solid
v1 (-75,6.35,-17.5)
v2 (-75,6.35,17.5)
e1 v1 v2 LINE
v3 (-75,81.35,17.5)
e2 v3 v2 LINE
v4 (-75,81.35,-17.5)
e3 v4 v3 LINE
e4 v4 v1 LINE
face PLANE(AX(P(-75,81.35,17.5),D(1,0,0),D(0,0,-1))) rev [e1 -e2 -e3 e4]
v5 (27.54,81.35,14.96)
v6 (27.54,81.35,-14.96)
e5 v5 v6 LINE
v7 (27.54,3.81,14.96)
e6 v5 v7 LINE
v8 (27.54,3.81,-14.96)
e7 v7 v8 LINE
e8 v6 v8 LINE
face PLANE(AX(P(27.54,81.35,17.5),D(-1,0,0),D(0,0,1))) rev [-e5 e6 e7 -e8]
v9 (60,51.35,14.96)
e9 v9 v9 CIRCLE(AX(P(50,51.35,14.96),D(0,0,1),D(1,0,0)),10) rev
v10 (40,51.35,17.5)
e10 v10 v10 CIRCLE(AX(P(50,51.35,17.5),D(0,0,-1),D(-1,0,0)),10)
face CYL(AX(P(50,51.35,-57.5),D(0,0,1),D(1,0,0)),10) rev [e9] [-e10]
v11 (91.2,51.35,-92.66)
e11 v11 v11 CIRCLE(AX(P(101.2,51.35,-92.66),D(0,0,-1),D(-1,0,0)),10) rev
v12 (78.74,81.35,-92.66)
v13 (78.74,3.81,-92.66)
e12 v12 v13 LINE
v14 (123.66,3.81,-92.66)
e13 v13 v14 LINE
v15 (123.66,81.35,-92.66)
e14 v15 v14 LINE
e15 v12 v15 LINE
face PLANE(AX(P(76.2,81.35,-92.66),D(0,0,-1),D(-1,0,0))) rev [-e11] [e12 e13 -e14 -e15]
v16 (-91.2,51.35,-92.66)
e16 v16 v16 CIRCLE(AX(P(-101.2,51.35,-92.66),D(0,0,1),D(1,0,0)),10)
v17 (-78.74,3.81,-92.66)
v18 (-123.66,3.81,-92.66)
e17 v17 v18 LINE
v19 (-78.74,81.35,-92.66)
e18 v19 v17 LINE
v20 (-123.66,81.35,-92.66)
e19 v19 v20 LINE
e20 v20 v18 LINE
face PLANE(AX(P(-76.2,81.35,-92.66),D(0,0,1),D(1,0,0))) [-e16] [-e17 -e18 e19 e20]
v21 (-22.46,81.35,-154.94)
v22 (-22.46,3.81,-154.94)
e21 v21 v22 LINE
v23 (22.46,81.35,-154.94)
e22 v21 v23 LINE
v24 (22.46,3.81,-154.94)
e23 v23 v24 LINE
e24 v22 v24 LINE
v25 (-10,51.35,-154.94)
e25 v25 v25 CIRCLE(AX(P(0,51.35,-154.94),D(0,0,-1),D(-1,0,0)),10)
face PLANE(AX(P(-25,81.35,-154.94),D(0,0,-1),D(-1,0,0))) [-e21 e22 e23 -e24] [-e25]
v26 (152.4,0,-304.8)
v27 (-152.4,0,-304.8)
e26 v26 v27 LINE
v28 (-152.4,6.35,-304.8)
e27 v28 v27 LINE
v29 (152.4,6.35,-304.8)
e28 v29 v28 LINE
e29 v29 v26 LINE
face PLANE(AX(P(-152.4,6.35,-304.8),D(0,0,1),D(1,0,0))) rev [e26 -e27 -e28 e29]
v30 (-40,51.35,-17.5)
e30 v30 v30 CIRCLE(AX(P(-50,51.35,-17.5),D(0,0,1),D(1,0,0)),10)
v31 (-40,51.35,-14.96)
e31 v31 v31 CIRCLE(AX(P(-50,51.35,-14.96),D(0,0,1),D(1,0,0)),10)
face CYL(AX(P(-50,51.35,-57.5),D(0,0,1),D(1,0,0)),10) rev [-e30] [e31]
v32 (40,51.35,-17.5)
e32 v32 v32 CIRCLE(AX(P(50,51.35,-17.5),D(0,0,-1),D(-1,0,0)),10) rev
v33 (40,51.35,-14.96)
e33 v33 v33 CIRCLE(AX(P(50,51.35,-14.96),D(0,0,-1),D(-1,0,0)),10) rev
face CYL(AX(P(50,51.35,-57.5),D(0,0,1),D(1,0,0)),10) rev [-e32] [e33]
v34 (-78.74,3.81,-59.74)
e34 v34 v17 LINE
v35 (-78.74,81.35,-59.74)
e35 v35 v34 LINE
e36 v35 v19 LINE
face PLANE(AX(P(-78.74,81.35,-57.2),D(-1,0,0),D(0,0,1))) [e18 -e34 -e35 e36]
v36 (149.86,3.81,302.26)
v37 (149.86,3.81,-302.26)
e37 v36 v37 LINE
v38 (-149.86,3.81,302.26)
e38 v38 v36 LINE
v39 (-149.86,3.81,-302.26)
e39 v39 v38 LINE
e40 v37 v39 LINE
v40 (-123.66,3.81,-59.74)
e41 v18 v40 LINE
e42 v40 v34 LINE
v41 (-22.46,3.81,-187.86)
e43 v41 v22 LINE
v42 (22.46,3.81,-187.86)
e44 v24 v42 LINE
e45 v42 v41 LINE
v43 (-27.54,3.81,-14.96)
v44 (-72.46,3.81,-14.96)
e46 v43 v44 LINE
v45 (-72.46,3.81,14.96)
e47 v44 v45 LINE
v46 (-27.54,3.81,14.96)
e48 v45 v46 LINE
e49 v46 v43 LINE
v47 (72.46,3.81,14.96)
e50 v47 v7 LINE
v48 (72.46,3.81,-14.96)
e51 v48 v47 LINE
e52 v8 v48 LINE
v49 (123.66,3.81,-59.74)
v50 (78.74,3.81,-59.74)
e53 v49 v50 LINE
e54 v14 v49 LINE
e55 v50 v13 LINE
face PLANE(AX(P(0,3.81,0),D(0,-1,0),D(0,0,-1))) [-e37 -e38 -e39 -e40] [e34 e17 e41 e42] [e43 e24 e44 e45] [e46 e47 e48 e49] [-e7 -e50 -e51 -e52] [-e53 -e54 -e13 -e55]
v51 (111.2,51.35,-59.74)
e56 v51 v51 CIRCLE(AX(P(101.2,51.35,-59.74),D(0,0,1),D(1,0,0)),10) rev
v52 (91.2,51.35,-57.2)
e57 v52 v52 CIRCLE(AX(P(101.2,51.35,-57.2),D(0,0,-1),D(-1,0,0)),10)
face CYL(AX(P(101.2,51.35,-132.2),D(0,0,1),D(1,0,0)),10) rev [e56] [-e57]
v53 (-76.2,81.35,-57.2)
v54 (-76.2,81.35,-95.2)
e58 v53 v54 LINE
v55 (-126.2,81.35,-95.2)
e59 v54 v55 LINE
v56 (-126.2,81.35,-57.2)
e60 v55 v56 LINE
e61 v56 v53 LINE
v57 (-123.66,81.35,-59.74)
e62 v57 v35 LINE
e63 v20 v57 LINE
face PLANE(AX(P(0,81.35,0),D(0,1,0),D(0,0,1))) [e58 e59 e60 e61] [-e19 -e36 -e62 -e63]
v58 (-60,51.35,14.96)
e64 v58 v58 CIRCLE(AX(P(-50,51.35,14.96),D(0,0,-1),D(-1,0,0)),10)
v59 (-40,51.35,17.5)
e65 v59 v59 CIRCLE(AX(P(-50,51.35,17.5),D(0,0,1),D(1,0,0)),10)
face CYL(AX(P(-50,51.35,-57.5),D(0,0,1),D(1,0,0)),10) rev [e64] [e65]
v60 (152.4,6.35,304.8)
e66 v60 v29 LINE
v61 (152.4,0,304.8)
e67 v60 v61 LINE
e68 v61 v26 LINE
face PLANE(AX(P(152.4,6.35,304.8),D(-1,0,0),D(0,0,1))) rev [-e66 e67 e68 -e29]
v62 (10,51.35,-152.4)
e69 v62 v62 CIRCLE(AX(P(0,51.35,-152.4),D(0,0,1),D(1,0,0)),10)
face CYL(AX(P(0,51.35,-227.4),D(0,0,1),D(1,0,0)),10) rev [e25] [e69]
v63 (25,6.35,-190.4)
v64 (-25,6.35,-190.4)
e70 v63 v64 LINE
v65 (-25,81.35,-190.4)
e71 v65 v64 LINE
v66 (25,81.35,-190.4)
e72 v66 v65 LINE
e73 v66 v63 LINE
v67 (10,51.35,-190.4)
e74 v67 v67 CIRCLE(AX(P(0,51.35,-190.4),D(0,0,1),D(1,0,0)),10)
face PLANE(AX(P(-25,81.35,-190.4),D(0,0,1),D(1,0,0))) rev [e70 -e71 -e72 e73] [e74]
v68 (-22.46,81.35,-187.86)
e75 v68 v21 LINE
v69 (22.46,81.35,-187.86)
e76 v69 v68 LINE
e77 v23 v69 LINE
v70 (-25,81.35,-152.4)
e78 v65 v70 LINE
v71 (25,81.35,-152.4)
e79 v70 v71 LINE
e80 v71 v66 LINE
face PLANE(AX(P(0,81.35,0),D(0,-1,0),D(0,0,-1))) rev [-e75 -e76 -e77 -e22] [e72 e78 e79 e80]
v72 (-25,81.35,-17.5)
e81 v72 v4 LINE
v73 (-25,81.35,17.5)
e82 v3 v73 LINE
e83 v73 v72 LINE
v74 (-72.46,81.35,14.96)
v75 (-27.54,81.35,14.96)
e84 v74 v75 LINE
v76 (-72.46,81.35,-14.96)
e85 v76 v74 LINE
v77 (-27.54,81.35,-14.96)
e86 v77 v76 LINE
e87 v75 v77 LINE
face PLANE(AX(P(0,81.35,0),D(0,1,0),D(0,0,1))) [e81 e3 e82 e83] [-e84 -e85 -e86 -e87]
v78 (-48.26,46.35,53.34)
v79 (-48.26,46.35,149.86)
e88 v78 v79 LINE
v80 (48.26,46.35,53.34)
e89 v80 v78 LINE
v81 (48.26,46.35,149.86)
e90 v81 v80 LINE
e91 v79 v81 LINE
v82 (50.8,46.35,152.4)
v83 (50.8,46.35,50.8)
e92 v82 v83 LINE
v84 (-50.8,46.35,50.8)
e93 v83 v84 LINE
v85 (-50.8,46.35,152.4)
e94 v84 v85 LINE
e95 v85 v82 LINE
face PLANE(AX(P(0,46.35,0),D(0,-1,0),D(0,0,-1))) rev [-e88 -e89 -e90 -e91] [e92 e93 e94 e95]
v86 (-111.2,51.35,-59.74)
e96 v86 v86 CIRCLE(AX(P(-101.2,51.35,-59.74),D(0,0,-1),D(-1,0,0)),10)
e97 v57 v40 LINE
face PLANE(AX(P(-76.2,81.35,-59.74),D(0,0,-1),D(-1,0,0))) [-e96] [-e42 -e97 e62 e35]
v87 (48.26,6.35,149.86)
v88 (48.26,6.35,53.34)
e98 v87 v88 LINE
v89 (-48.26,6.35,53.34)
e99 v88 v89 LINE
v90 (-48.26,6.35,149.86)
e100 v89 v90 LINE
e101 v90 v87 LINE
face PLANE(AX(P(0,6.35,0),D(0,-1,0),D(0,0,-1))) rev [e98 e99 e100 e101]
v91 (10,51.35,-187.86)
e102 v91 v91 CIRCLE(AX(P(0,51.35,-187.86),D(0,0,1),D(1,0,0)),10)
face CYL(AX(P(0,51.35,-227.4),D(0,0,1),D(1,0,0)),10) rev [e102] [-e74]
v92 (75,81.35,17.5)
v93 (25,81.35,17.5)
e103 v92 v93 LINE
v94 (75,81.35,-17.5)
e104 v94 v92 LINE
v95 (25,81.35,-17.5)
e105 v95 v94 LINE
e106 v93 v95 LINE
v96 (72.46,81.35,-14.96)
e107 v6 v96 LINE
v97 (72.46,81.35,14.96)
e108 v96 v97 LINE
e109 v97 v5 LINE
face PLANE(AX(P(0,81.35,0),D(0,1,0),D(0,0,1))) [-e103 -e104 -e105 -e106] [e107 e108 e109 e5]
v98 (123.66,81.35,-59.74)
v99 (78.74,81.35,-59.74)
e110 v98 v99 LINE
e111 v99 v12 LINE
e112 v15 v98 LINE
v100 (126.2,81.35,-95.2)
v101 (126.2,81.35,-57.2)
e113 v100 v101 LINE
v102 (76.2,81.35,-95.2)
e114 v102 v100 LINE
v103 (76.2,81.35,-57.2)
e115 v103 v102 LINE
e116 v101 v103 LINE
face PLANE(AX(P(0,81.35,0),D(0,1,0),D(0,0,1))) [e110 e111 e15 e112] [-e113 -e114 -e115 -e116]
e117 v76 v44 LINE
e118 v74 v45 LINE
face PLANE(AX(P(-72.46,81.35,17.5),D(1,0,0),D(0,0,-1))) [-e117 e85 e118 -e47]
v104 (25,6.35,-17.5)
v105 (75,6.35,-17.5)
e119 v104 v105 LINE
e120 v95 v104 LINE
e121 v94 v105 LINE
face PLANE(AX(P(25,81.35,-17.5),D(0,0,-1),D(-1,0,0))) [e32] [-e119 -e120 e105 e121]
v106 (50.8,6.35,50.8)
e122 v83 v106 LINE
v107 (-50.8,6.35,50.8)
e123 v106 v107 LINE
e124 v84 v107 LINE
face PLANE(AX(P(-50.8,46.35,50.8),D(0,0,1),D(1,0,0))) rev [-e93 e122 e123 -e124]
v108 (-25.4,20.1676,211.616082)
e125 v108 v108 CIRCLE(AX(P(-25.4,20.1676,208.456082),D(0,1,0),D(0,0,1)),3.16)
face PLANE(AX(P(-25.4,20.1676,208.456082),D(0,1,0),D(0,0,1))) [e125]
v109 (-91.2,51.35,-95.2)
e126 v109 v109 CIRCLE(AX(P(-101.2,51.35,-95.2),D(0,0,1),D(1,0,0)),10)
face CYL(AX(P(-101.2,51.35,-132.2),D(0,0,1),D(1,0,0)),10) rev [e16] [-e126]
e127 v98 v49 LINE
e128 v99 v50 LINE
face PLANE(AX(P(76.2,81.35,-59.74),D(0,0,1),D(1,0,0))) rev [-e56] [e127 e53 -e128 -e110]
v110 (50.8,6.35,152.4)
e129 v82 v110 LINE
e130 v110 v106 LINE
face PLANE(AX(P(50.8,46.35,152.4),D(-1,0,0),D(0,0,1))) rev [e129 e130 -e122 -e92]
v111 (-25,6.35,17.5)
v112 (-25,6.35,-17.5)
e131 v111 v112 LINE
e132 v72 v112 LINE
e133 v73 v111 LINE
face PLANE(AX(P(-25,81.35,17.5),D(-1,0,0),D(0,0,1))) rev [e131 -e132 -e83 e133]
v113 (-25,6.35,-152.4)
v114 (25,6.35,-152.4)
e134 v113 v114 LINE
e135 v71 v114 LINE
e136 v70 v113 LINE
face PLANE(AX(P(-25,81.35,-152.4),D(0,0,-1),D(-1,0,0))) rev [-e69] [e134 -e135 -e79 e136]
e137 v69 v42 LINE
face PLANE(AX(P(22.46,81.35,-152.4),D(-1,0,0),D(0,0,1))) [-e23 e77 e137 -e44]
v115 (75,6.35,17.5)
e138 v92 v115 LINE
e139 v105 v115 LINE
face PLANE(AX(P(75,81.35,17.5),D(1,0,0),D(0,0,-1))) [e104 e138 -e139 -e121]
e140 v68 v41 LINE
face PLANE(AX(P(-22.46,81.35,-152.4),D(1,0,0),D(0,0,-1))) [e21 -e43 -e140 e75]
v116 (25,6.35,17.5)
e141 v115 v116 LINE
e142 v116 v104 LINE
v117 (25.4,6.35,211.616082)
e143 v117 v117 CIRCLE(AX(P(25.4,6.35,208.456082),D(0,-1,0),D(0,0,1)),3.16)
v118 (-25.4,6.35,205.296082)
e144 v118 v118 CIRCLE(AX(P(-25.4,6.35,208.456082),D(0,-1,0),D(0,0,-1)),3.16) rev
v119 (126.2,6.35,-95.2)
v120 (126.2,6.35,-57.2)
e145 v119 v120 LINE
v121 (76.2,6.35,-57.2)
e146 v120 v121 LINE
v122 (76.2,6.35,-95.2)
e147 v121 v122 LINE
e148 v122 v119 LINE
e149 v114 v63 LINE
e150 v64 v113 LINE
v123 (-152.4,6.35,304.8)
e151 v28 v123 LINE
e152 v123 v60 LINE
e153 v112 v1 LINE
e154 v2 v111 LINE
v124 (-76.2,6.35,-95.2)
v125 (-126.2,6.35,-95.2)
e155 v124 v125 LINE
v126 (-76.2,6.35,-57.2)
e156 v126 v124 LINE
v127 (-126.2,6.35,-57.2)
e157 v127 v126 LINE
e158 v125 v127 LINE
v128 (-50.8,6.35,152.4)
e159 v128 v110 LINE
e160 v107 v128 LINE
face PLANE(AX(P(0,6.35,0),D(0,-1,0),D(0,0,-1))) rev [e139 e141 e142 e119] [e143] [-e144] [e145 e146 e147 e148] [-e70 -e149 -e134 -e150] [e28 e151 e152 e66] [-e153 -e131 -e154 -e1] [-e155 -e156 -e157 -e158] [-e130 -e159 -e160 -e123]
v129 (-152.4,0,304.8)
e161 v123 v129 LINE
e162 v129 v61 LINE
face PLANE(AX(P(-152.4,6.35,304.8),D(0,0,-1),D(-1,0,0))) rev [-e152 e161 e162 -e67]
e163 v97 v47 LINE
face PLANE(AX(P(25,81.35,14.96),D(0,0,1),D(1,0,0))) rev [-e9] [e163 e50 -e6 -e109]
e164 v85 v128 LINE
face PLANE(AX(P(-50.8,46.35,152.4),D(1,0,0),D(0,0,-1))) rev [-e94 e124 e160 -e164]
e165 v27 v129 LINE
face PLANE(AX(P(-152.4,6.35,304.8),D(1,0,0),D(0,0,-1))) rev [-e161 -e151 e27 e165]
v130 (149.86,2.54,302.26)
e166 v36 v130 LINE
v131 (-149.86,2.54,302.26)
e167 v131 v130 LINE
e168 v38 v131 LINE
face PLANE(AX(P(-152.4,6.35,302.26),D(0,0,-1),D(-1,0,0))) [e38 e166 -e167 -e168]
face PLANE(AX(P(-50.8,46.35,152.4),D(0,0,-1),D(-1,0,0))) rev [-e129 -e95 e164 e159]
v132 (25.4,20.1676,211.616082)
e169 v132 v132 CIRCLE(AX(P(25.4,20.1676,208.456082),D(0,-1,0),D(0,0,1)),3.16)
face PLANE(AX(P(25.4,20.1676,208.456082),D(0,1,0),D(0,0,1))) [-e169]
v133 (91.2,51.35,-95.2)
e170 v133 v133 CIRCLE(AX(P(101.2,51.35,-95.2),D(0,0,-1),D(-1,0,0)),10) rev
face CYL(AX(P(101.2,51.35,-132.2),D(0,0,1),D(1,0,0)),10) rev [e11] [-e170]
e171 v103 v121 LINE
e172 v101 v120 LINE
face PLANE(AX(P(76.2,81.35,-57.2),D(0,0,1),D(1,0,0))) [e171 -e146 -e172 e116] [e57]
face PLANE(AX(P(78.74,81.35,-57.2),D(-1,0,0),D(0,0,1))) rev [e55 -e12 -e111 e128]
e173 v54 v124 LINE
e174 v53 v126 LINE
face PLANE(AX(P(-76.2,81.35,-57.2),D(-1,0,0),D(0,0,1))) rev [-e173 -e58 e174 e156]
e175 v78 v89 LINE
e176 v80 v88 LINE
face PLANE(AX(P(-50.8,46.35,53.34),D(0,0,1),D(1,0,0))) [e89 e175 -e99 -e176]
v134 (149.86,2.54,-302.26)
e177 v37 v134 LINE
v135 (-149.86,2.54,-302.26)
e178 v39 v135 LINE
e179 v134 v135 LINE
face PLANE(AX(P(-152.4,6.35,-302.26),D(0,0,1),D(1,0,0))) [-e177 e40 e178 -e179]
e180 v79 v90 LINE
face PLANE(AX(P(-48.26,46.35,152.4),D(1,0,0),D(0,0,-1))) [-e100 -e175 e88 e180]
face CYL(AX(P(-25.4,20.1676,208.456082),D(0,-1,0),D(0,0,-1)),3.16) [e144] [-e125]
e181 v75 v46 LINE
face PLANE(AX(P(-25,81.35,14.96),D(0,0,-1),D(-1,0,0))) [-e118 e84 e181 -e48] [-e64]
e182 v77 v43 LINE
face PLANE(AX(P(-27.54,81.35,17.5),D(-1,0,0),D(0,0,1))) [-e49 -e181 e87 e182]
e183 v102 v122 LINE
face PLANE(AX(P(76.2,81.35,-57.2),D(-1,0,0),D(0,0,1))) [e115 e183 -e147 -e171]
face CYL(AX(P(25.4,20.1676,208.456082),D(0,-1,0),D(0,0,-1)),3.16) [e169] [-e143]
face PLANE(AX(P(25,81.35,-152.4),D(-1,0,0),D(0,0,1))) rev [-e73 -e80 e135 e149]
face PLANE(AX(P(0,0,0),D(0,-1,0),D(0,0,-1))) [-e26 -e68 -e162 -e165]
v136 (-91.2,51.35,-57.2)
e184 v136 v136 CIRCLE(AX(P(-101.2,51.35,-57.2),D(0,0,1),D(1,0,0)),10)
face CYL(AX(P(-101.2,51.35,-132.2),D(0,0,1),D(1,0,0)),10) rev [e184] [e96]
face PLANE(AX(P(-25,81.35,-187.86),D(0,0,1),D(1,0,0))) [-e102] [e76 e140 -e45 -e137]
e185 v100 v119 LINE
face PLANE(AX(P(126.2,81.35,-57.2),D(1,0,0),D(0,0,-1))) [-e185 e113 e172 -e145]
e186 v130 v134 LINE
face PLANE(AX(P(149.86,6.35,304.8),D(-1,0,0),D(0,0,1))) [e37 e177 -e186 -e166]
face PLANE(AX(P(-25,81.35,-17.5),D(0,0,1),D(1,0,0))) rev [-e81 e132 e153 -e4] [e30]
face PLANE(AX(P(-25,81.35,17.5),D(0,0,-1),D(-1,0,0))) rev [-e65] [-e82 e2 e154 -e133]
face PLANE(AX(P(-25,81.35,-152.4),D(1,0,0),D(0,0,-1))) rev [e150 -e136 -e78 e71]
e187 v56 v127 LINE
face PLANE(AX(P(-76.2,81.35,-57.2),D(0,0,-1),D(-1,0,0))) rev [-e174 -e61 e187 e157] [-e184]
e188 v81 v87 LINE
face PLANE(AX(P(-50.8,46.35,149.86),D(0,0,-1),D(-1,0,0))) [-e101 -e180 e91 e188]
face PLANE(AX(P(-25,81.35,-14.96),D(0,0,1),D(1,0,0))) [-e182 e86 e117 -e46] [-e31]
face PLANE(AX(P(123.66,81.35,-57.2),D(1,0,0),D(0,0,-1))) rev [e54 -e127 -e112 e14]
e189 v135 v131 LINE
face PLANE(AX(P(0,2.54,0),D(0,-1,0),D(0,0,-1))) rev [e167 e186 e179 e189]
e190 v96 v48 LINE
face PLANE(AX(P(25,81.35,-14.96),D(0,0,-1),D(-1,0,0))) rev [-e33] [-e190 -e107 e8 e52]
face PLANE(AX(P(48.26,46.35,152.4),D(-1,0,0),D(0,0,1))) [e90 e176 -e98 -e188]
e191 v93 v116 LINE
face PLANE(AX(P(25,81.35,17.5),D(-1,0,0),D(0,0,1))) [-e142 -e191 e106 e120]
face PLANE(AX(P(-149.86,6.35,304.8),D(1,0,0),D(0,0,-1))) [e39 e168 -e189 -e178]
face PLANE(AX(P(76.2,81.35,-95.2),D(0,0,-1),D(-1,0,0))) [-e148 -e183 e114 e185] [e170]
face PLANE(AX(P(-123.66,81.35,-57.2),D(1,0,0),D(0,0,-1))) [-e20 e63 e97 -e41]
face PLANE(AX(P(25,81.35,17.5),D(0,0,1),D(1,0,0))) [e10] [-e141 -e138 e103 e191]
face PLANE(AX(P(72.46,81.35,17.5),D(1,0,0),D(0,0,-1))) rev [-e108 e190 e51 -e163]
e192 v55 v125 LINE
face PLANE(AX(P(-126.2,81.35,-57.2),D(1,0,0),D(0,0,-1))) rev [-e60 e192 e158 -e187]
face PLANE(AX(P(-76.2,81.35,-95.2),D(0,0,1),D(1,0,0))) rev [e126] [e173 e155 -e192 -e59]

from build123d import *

# Parameters (mm, degrees)
SKETCH1_W           = 304.8
SKETCH1_H           = 609.6
BOSS_EXTRUDE1_DEPTH = 6.35
SKETCH2_W           = 50
SKETCH2_H           = 38
BOSS_EXTRUDE2_DEPTH = 75
SKETCH4_W           = 50.000000076
SKETCH4_H           = 37.999999946
BOSS_EXTRUDE3_DEPTH = 75
SKETCH5_W           = 50
SKETCH5_H           = 35
BOSS_EXTRUDE4_DEPTH = 75
SHELL11_T           = -2.54
SKETCH3_R           = 10
CUT_EXTRUDE2_DEPTH  = 75
SKETCH6_R           = 10
CUT_EXTRUDE3_DEPTH  = 75
SKETCH7_R           = 10
CUT_EXTRUDE4_DEPTH  = 75
SKETCH8_W           = 101.6
SKETCH8_H           = 101.6
BOSS_EXTRUDE5_DEPTH = 40
SHELL12_START       = 6.35
SHELL12_OUTLINE_W   = 96.52
SHELL12_OUTLINE_H   = 96.52
SHELL12_DEPTH       = 40
SKETCH9_R           = 3.16
BOSS_EXTRUDE6_DEPTH = 13.8176


# Read off the part's stored shape, not the designer's step: Shell12
with BuildPart() as part:
    # Sketch1 → Boss-Extrude1 (new body)
    with BuildSketch(Plane(origin=(0, 0, 0), x_dir=(1, 0, 0), z_dir=(0, 1, 0))):
        Rectangle(SKETCH1_W, SKETCH1_H)
    extrude(amount=BOSS_EXTRUDE1_DEPTH)

    # Sketch2 → Boss-Extrude2 (add)
    with BuildSketch(Plane(origin=(0, 6.35, 0), x_dir=(1, 0, 0), z_dir=(0, 1, 0))):
        with Locations((0, 171.4)):
            Rectangle(SKETCH2_W, SKETCH2_H)
    extrude(amount=BOSS_EXTRUDE2_DEPTH)

    # Sketch4 → Boss-Extrude3 (add)
    with BuildSketch(Plane(origin=(0, 6.35, 0), x_dir=(1, 0, 0), z_dir=(0, 1, 0))):
        with Locations((-101.200000038, 76.2)):
            Rectangle(SKETCH4_W, SKETCH4_H)
    boss_extrude3 = extrude(amount=BOSS_EXTRUDE3_DEPTH)

    # Sketch5 → Boss-Extrude4 (add)
    with BuildSketch(Plane(origin=(0, 6.35, 0), x_dir=(1, 0, 0), z_dir=(0, 1, 0))):
        with Locations((-50, 0)):
            Rectangle(SKETCH5_W, SKETCH5_H)
    boss_extrude4 = extrude(amount=BOSS_EXTRUDE4_DEPTH)

    # Mirror1: Boss-Extrude3, Boss-Extrude4 across plane
    add(boss_extrude3.mirror(Plane(origin=(0, 0, 0), x_dir=(0, 0, 1), z_dir=(1, 0, 0))))
    add(boss_extrude4.mirror(Plane(origin=(0, 0, 0), x_dir=(0, 0, 1), z_dir=(1, 0, 0))))

    # Shell11
    shell11_openings = [part.faces().sort_by_distance(p)[0] for p in [
        (0, 81.35, -171.4),
        (-101.200000038, 81.35, -76.2),
        (-50, 81.35, 0),
        (101.200000038, 81.35, -76.2),
        (50, 81.35, 0),
    ]]
    offset(amount=SHELL11_T, openings=shell11_openings, kind=Kind.INTERSECTION)

    # Sketch3 → Cut-Extrude2 (cut)
    with BuildSketch(Plane.XY.offset(-152.4)):
        with Locations((0, 51.35)):
            Circle(SKETCH3_R)
    extrude(amount=-CUT_EXTRUDE2_DEPTH, mode=Mode.SUBTRACT)

    # Sketch6 → Cut-Extrude3 (cut)
    with BuildSketch(Plane.XY.offset(-57.200000027)):
        with Locations((-101.2, 51.35)):
            Circle(SKETCH6_R)
    cut_extrude3 = extrude(amount=-CUT_EXTRUDE3_DEPTH, mode=Mode.SUBTRACT)

    # Sketch7 → Cut-Extrude4 (cut)
    with BuildSketch(Plane.XY.offset(17.5)):
        with Locations((-50, 51.35)):
            Circle(SKETCH7_R)
    cut_extrude4 = extrude(amount=-CUT_EXTRUDE4_DEPTH, mode=Mode.SUBTRACT)

    # Mirror2: Cut-Extrude3, Cut-Extrude4 across plane
    add(cut_extrude3.mirror(Plane(origin=(0, 0, 0), x_dir=(0, 0, 1), z_dir=(1, 0, 0))), mode=Mode.SUBTRACT)
    add(cut_extrude4.mirror(Plane(origin=(0, 0, 0), x_dir=(0, 0, 1), z_dir=(1, 0, 0))), mode=Mode.SUBTRACT)

    # Sketch8 → Boss-Extrude5 (add)
    with BuildSketch(Plane(origin=(0, 6.35, 0), x_dir=(1, 0, 0), z_dir=(0, 1, 0))):
        with Locations((0, -101.6)):
            Rectangle(SKETCH8_W, SKETCH8_H)
    extrude(amount=BOSS_EXTRUDE5_DEPTH)

    # Shell12 outline → Shell12 (cut)
    with BuildSketch(Plane(origin=(0, 0, 0), x_dir=(1, 0, 0), z_dir=(0, 1, 0)).offset(SHELL12_START)):
        with Locations((0, -101.6)):
            Rectangle(SHELL12_OUTLINE_W, SHELL12_OUTLINE_H)
    extrude(amount=SHELL12_DEPTH, mode=Mode.SUBTRACT)

    # Sketch9 → Boss-Extrude6 (add)
    with BuildSketch(Plane(origin=(0, 6.35, 0), x_dir=(1, 0, 0), z_dir=(0, 1, 0))):
        with Locations(Location((-25.4, -208.456082319, 0), (0, 0, 90))):
            Circle(SKETCH9_R)
    boss_extrude6 = extrude(amount=BOSS_EXTRUDE6_DEPTH)

    # Mirror3: Boss-Extrude6 across plane
    add(boss_extrude6.mirror(Plane(origin=(0, 0, 0), x_dir=(0, 0, 1), z_dir=(1, 0, 0))))


solid = part.part
